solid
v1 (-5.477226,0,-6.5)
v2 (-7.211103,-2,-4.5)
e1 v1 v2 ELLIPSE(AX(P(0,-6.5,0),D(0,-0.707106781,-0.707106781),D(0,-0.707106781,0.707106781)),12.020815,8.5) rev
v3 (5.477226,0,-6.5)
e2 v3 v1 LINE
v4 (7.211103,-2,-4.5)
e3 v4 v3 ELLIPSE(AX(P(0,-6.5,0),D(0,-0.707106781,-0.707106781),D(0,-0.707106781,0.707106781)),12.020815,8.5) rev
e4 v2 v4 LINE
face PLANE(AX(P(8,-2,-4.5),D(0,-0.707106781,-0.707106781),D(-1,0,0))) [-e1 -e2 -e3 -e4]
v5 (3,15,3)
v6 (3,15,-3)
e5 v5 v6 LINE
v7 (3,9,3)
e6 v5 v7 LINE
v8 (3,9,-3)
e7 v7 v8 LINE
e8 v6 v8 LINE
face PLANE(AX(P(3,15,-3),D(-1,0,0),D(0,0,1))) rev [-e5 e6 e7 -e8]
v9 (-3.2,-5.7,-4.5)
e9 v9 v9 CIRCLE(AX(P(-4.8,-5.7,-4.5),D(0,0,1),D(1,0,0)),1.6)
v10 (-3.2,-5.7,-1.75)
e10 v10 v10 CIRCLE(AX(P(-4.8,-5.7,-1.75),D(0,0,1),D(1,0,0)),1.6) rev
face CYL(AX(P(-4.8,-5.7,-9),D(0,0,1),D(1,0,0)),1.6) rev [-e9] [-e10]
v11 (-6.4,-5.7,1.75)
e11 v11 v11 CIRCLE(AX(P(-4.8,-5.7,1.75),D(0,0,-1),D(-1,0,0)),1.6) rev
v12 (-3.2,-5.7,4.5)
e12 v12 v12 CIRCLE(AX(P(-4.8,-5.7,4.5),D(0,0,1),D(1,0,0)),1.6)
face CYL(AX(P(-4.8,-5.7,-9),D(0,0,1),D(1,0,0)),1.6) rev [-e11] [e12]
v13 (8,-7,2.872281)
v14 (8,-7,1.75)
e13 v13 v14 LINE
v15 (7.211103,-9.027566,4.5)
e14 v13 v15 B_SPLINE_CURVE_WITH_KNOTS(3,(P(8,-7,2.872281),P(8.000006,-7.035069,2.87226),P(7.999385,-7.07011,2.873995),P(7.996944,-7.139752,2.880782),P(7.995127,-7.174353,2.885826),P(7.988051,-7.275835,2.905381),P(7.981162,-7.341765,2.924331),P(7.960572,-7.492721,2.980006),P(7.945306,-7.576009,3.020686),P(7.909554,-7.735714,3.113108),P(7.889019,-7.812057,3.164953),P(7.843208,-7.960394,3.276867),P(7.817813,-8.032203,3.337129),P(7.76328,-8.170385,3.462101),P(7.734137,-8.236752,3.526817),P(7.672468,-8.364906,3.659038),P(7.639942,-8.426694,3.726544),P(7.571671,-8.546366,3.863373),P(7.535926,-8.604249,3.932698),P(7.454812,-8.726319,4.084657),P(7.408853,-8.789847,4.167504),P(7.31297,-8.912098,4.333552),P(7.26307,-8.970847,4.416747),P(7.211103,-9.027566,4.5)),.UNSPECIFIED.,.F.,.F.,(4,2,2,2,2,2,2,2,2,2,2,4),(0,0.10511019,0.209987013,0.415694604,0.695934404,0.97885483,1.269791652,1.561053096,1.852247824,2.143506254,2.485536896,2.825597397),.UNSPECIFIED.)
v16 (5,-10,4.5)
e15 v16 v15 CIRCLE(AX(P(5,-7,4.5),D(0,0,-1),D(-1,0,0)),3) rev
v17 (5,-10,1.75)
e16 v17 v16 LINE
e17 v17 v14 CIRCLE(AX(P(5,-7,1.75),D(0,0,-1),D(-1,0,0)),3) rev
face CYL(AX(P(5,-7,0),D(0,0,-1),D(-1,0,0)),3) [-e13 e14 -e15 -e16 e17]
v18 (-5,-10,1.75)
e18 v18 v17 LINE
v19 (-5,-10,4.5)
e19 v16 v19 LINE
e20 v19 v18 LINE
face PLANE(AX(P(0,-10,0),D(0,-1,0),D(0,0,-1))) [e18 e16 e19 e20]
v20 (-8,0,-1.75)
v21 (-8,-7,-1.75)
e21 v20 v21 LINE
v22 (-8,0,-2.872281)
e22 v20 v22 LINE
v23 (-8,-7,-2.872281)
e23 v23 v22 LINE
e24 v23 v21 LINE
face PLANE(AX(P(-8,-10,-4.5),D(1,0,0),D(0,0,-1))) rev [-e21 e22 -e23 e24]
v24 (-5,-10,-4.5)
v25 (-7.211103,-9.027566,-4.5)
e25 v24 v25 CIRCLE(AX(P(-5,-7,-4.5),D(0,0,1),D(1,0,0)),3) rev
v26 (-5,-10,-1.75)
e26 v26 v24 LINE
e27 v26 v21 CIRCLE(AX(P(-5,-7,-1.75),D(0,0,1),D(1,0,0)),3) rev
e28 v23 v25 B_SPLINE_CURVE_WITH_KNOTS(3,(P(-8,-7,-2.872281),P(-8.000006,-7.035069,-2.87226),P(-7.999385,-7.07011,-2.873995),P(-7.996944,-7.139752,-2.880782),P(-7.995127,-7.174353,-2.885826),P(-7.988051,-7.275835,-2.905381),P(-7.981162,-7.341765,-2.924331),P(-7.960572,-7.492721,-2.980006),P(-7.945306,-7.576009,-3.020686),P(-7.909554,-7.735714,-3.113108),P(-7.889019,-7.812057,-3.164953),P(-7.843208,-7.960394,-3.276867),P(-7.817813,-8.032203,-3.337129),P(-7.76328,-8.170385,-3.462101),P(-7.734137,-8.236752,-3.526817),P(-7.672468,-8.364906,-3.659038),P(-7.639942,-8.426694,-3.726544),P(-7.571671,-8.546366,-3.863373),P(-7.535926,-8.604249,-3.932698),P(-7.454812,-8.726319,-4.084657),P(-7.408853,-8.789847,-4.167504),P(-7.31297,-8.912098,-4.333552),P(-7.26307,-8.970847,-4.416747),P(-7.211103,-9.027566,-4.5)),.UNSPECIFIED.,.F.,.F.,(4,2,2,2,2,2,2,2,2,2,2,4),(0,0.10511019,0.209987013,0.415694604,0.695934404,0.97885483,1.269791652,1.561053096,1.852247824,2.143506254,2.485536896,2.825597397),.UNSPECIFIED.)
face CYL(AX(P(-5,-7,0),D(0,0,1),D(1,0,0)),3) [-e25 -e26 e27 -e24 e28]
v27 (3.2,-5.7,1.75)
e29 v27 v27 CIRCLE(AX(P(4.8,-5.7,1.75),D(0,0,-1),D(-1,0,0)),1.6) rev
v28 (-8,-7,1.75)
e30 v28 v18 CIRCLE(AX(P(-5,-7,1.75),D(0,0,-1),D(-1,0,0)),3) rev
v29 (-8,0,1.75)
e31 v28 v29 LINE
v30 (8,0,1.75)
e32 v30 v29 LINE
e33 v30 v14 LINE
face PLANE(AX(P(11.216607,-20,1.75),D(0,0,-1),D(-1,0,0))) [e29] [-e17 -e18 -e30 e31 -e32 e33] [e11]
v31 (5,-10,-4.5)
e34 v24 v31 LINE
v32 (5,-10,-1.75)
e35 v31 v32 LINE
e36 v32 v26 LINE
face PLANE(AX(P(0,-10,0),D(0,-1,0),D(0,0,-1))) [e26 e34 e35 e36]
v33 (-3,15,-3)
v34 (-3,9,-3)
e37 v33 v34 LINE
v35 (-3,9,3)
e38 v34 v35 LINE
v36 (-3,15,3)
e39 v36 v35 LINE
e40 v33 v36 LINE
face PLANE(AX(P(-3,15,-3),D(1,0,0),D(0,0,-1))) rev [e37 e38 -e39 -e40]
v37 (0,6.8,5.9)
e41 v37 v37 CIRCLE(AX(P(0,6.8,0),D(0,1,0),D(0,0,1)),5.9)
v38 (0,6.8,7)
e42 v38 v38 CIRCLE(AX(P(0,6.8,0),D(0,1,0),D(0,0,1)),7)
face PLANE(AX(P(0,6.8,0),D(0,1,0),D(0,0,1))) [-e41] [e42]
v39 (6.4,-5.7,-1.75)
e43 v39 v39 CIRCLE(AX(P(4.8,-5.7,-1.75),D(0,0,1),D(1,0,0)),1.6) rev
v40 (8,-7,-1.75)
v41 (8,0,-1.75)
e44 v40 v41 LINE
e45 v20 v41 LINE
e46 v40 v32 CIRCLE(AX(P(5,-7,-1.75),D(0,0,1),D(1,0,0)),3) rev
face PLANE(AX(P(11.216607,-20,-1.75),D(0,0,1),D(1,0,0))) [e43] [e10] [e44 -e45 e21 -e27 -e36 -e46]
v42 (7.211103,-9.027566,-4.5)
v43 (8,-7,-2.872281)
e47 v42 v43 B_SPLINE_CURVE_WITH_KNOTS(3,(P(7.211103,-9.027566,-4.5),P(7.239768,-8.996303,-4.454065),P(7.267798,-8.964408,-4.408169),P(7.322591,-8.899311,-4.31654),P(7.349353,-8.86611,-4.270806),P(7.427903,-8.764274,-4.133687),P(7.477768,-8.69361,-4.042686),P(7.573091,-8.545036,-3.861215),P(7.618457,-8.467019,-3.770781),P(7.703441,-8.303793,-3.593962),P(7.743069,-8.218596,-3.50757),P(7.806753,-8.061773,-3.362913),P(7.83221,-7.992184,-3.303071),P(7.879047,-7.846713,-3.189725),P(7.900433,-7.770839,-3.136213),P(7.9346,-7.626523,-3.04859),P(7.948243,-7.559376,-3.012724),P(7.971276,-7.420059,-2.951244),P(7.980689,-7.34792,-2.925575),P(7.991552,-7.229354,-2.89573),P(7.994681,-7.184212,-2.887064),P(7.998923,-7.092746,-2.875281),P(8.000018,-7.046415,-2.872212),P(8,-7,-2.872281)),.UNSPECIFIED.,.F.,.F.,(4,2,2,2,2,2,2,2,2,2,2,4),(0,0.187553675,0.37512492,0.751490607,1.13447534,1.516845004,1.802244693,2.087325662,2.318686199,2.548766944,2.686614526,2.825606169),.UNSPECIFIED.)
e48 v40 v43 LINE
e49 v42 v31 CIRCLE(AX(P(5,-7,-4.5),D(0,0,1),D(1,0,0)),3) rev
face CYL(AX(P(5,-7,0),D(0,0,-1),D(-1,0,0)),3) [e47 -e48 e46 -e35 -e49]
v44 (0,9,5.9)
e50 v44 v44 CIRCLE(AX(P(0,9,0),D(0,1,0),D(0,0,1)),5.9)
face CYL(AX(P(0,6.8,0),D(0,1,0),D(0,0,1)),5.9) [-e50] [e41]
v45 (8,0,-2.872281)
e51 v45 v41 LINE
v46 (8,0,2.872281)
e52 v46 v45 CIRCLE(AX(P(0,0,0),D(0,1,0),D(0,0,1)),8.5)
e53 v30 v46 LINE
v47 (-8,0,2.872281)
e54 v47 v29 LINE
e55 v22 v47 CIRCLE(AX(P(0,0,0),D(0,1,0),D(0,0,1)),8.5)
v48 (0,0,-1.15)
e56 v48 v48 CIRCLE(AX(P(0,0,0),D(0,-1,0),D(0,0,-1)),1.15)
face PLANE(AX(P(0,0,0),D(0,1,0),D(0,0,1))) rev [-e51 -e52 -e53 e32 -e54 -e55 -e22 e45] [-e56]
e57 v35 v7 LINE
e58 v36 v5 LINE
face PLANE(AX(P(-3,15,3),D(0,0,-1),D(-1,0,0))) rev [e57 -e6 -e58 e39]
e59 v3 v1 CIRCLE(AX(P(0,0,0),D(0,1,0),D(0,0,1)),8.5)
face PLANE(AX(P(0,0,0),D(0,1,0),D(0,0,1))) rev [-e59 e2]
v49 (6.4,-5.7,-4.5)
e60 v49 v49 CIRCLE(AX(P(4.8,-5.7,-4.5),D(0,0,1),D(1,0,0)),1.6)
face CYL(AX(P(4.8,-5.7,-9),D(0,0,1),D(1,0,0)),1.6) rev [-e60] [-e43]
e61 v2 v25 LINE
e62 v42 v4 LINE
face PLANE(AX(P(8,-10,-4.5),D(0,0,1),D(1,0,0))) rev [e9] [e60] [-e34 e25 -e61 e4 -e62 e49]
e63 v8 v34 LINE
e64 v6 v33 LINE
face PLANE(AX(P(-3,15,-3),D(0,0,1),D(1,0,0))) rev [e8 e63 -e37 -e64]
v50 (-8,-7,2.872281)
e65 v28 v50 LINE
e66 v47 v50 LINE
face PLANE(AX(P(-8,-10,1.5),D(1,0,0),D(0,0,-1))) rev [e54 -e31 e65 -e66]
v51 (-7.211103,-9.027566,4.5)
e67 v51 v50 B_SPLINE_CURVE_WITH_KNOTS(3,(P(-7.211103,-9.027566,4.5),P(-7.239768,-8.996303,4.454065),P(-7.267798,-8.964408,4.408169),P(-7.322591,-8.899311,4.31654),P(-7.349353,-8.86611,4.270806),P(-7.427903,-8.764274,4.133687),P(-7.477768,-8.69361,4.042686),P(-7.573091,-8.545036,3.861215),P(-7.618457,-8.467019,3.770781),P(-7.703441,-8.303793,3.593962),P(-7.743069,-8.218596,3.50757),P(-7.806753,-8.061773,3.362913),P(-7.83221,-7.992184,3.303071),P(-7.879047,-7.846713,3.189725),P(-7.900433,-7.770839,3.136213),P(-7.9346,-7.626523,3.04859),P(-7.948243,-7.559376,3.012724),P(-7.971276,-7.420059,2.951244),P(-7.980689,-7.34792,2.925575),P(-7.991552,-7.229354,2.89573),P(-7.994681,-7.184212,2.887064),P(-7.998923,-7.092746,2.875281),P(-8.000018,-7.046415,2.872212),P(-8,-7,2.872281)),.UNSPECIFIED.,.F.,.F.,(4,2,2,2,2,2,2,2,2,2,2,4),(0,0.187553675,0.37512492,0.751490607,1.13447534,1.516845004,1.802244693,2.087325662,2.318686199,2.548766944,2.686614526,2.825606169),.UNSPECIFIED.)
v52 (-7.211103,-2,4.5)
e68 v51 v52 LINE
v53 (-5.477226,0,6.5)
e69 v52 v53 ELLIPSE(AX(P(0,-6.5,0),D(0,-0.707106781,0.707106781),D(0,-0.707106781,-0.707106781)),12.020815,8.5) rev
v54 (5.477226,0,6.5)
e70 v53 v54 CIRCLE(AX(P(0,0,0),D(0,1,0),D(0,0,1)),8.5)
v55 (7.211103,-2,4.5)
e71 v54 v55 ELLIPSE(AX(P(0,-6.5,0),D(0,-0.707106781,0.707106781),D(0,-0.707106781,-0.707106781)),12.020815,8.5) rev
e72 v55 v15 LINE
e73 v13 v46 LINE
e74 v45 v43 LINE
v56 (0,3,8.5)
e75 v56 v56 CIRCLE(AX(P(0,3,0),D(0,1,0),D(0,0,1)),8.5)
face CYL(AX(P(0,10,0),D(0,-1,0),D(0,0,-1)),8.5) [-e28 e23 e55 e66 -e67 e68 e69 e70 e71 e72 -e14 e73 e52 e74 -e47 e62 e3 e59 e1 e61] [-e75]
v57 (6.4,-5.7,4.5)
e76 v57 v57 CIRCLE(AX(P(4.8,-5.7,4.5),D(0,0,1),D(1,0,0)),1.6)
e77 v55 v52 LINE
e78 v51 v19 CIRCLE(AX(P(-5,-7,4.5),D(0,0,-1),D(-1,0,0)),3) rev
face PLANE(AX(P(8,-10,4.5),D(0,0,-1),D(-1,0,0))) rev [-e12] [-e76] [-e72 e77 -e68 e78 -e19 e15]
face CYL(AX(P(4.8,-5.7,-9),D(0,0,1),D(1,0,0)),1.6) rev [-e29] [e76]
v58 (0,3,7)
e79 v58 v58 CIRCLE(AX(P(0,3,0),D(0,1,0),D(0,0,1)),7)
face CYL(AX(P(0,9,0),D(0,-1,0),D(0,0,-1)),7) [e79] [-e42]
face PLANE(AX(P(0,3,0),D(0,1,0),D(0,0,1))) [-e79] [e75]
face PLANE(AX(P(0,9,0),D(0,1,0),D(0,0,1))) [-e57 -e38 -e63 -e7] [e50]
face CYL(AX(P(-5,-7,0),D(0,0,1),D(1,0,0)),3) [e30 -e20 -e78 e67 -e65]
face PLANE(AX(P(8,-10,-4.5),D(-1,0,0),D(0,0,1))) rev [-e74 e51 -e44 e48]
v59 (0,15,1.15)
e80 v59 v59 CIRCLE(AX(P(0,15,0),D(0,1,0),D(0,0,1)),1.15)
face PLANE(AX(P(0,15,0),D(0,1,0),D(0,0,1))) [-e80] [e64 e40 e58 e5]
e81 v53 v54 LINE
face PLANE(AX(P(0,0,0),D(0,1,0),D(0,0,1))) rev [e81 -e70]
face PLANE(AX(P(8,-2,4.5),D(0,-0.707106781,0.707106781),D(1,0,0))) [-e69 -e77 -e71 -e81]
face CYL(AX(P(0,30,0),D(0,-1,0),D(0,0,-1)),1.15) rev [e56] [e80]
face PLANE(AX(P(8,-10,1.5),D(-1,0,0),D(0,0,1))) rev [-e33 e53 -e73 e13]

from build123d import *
from build123d.topology import SkipClean

# Parameters (mm, degrees)
SKETCH_9_R          = 9
EXTRUDE_4_DEPTH     = 3
SKETCH_10_R         = 7
EXTRUDE_5_DEPTH     = 6
SKETCH_11_W         = 16
SKETCH_11_H         = 3
EXTRUDE_6_DEPTH     = 10
SKETCH_12_R         = 1.6
CUT_EXTRUDE_3_DEPTH = 20.059118553
SKETCH_13_R         = 12.035495365
SKETCH_13_R_2       = 9
CUT_EXTRUDE_4_DEPTH = 30
FILLET_1_R          = 3
SKETCH_14_R         = 1.15
CUT_EXTRUDE_5_DEPTH = 30
SKETCH_15_W         = 22.433214128
SKETCH_15_H         = 3.5
CUT_EXTRUDE_6_DEPTH = 20
SKETCH_17_R         = 12.049205959
SKETCH_17_R_2       = 8.5
CUT_EXTRUDE_7_DEPTH = 20
SKETCH_18_R         = 9.534410067
SKETCH_18_R_2       = 5.9
CUT_EXTRUDE_8_DEPTH = 2.2
SKETCH_20_W         = 6
SKETCH_20_H         = 6
SKETCH_20_R         = 1.15
EXTRUDE_7_DEPTH     = 6
CHAMFER_1_SIZE      = 2


with BuildPart() as part:
    # Эскиз9 → Бобышка-Вытянуть4 (new body)
    with BuildSketch(Plane(origin=(0, 0, 0), x_dir=(1, 0, 0), z_dir=(0, 1, 0))):
        with Locations(Location((0, 0, 0), (0, 0, 270))):
            Circle(SKETCH_9_R)
    extrude(amount=EXTRUDE_4_DEPTH)

    # Эскиз10 → Бобышка-Вытянуть5 (add)
    with BuildSketch(Plane(origin=(0, 3, 0), x_dir=(1, 0, 0), z_dir=(0, 1, 0))):
        with Locations(Location((0, 0, 0), (0, 0, 270))):
            Circle(SKETCH_10_R)
    extrude(amount=EXTRUDE_5_DEPTH)

    # Эскиз11 → Бобышка-Вытянуть6 (add)
    with BuildSketch(Plane.XZ):
        with Locations((0, -3)):
            Rectangle(SKETCH_11_W, SKETCH_11_H)
        with Locations((0, 3)):
            Rectangle(SKETCH_11_W, SKETCH_11_H)
    extrude(amount=EXTRUDE_6_DEPTH)

    # Эскиз12 → Вырез-Вытянуть3 (cut, through all)
    with BuildSketch(Plane.XY.offset(4.5)):
        with Locations((-4.8, -5.7)):
            Circle(SKETCH_12_R)
        with Locations((4.8, -5.7)):
            Circle(SKETCH_12_R)
    extrude(amount=-CUT_EXTRUDE_3_DEPTH, mode=Mode.SUBTRACT)

    # Эскиз13 → Вырез-Вытянуть4 (cut)
    with SkipClean():  # the faces are left unmerged after this step: merging them gives an invalid solid
        with BuildSketch(Plane.XZ.offset(10)):
            Circle(SKETCH_13_R)
            with Locations(Location((0, 0, 0), (0, 0, 210))):
                Circle(SKETCH_13_R_2, mode=Mode.SUBTRACT)
        extrude(amount=-CUT_EXTRUDE_4_DEPTH, mode=Mode.SUBTRACT)
    add(part.part.scale(1), mode=Mode.REPLACE)  # the faces are merged on a copy

    # Скругление1
    fillet_1_edges = [part.edges().sort_by_distance(p)[0] for p in [
        (-8, -10, -2.811552813),
        (8, -10, -2.811552813),
        (8, -10, 2.811552813),
        (-8, -10, 2.811552813),
    ]]
    fillet(fillet_1_edges, radius=FILLET_1_R)

    # Эскиз14 → Вырез-Вытянуть5 (cut)
    with BuildSketch(Plane.XZ):
        with Locations(Location((0, 0, 0), (0, 0, 270))):
            Circle(SKETCH_14_R)
    extrude(amount=-CUT_EXTRUDE_5_DEPTH, mode=Mode.SUBTRACT)

    # Эскиз15 → Вырез-Вытянуть6 (cut)
    with BuildSketch(Plane.XZ):
        Rectangle(SKETCH_15_W, SKETCH_15_H)
    extrude(amount=CUT_EXTRUDE_6_DEPTH, mode=Mode.SUBTRACT)

    # Эскиз17 → Вырез-Вытянуть7 (cut)
    with BuildSketch(Plane.XZ.offset(10)):
        Circle(SKETCH_17_R)
        with Locations(Location((0, 0, 0), (0, 0, 328.034281249))):
            Circle(SKETCH_17_R_2, mode=Mode.SUBTRACT)
    extrude(amount=-CUT_EXTRUDE_7_DEPTH, mode=Mode.SUBTRACT)

    # Эскиз18 → Вырез-Вытянуть8 (cut)
    with BuildSketch(Plane(origin=(0, 9, 0), x_dir=(1, 0, 0), z_dir=(0, 1, 0))):
        Circle(SKETCH_18_R)
        with Locations(Location((0, 0, 0), (0, 0, 270))):
            Circle(SKETCH_18_R_2, mode=Mode.SUBTRACT)
    extrude(amount=-CUT_EXTRUDE_8_DEPTH, mode=Mode.SUBTRACT)

    # Эскиз20 → Бобышка-Вытянуть7 (add)
    with SkipClean():  # the faces are left unmerged after this step: merging them gives an invalid solid
        with BuildSketch(Plane(origin=(0, 9, 0), x_dir=(1, 0, 0), z_dir=(0, 1, 0))):
            Rectangle(SKETCH_20_W, SKETCH_20_H)
            with Locations(Location((0, 0, 0), (0, 0, 90))):
                Circle(SKETCH_20_R, mode=Mode.SUBTRACT)
        extrude(amount=EXTRUDE_7_DEPTH)

    # Фаска1
    # the kernel refuses this chamfer: 2 mm, written as the material it adds along each edge
    with BuildSketch(Plane(origin=(12.354468527, 0, -4.5), x_dir=(0, -0.9996219169112968, 0.027495876610586494), z_dir=(-1, 0, 0))) as chamfer_1_piece_1_section:
        Polygon((CHAMFER_1_SIZE * 0.999621916911, -CHAMFER_1_SIZE * 0.0274958766106), (-CHAMFER_1_SIZE * 0.0274958766106, -CHAMFER_1_SIZE * 0.999621916911), (0, 0), align=None)
    chamfer_1_piece_1 = extrude(amount=24.708937054, mode=Mode.PRIVATE)
    chamfer_1_piece_1 = chamfer_1_piece_1 & Plane(origin=(0, -0.675834344, 0), x_dir=(0.8483650059896506, 0, -0.5294117647088891), z_dir=(0, -1, 0)) * Cylinder(8.5, 58, mode=Mode.PRIVATE)
    add(chamfer_1_piece_1)
    with BuildSketch(Plane(origin=(-12.354468527, 0, 4.5), x_dir=(0, -0.9996219169112968, -0.027495876610586494), z_dir=(1, 0, 0))) as chamfer_1_piece_2_section:
        Polygon((CHAMFER_1_SIZE * 0.999621916911, -CHAMFER_1_SIZE * 0.0274958766106), (-CHAMFER_1_SIZE * 0.0274958766106, -CHAMFER_1_SIZE * 0.999621916911), (0, 0), align=None)
    chamfer_1_piece_2 = extrude(amount=24.708937054, mode=Mode.PRIVATE)
    chamfer_1_piece_2 = chamfer_1_piece_2 & Plane(origin=(0, -0.675834348, 0), x_dir=(0.8483650059896506, 0, -0.5294117647088891), z_dir=(0, -1, 0)) * Cylinder(8.5, 58, mode=Mode.PRIVATE)
    add(chamfer_1_piece_2)


solid = part.part
